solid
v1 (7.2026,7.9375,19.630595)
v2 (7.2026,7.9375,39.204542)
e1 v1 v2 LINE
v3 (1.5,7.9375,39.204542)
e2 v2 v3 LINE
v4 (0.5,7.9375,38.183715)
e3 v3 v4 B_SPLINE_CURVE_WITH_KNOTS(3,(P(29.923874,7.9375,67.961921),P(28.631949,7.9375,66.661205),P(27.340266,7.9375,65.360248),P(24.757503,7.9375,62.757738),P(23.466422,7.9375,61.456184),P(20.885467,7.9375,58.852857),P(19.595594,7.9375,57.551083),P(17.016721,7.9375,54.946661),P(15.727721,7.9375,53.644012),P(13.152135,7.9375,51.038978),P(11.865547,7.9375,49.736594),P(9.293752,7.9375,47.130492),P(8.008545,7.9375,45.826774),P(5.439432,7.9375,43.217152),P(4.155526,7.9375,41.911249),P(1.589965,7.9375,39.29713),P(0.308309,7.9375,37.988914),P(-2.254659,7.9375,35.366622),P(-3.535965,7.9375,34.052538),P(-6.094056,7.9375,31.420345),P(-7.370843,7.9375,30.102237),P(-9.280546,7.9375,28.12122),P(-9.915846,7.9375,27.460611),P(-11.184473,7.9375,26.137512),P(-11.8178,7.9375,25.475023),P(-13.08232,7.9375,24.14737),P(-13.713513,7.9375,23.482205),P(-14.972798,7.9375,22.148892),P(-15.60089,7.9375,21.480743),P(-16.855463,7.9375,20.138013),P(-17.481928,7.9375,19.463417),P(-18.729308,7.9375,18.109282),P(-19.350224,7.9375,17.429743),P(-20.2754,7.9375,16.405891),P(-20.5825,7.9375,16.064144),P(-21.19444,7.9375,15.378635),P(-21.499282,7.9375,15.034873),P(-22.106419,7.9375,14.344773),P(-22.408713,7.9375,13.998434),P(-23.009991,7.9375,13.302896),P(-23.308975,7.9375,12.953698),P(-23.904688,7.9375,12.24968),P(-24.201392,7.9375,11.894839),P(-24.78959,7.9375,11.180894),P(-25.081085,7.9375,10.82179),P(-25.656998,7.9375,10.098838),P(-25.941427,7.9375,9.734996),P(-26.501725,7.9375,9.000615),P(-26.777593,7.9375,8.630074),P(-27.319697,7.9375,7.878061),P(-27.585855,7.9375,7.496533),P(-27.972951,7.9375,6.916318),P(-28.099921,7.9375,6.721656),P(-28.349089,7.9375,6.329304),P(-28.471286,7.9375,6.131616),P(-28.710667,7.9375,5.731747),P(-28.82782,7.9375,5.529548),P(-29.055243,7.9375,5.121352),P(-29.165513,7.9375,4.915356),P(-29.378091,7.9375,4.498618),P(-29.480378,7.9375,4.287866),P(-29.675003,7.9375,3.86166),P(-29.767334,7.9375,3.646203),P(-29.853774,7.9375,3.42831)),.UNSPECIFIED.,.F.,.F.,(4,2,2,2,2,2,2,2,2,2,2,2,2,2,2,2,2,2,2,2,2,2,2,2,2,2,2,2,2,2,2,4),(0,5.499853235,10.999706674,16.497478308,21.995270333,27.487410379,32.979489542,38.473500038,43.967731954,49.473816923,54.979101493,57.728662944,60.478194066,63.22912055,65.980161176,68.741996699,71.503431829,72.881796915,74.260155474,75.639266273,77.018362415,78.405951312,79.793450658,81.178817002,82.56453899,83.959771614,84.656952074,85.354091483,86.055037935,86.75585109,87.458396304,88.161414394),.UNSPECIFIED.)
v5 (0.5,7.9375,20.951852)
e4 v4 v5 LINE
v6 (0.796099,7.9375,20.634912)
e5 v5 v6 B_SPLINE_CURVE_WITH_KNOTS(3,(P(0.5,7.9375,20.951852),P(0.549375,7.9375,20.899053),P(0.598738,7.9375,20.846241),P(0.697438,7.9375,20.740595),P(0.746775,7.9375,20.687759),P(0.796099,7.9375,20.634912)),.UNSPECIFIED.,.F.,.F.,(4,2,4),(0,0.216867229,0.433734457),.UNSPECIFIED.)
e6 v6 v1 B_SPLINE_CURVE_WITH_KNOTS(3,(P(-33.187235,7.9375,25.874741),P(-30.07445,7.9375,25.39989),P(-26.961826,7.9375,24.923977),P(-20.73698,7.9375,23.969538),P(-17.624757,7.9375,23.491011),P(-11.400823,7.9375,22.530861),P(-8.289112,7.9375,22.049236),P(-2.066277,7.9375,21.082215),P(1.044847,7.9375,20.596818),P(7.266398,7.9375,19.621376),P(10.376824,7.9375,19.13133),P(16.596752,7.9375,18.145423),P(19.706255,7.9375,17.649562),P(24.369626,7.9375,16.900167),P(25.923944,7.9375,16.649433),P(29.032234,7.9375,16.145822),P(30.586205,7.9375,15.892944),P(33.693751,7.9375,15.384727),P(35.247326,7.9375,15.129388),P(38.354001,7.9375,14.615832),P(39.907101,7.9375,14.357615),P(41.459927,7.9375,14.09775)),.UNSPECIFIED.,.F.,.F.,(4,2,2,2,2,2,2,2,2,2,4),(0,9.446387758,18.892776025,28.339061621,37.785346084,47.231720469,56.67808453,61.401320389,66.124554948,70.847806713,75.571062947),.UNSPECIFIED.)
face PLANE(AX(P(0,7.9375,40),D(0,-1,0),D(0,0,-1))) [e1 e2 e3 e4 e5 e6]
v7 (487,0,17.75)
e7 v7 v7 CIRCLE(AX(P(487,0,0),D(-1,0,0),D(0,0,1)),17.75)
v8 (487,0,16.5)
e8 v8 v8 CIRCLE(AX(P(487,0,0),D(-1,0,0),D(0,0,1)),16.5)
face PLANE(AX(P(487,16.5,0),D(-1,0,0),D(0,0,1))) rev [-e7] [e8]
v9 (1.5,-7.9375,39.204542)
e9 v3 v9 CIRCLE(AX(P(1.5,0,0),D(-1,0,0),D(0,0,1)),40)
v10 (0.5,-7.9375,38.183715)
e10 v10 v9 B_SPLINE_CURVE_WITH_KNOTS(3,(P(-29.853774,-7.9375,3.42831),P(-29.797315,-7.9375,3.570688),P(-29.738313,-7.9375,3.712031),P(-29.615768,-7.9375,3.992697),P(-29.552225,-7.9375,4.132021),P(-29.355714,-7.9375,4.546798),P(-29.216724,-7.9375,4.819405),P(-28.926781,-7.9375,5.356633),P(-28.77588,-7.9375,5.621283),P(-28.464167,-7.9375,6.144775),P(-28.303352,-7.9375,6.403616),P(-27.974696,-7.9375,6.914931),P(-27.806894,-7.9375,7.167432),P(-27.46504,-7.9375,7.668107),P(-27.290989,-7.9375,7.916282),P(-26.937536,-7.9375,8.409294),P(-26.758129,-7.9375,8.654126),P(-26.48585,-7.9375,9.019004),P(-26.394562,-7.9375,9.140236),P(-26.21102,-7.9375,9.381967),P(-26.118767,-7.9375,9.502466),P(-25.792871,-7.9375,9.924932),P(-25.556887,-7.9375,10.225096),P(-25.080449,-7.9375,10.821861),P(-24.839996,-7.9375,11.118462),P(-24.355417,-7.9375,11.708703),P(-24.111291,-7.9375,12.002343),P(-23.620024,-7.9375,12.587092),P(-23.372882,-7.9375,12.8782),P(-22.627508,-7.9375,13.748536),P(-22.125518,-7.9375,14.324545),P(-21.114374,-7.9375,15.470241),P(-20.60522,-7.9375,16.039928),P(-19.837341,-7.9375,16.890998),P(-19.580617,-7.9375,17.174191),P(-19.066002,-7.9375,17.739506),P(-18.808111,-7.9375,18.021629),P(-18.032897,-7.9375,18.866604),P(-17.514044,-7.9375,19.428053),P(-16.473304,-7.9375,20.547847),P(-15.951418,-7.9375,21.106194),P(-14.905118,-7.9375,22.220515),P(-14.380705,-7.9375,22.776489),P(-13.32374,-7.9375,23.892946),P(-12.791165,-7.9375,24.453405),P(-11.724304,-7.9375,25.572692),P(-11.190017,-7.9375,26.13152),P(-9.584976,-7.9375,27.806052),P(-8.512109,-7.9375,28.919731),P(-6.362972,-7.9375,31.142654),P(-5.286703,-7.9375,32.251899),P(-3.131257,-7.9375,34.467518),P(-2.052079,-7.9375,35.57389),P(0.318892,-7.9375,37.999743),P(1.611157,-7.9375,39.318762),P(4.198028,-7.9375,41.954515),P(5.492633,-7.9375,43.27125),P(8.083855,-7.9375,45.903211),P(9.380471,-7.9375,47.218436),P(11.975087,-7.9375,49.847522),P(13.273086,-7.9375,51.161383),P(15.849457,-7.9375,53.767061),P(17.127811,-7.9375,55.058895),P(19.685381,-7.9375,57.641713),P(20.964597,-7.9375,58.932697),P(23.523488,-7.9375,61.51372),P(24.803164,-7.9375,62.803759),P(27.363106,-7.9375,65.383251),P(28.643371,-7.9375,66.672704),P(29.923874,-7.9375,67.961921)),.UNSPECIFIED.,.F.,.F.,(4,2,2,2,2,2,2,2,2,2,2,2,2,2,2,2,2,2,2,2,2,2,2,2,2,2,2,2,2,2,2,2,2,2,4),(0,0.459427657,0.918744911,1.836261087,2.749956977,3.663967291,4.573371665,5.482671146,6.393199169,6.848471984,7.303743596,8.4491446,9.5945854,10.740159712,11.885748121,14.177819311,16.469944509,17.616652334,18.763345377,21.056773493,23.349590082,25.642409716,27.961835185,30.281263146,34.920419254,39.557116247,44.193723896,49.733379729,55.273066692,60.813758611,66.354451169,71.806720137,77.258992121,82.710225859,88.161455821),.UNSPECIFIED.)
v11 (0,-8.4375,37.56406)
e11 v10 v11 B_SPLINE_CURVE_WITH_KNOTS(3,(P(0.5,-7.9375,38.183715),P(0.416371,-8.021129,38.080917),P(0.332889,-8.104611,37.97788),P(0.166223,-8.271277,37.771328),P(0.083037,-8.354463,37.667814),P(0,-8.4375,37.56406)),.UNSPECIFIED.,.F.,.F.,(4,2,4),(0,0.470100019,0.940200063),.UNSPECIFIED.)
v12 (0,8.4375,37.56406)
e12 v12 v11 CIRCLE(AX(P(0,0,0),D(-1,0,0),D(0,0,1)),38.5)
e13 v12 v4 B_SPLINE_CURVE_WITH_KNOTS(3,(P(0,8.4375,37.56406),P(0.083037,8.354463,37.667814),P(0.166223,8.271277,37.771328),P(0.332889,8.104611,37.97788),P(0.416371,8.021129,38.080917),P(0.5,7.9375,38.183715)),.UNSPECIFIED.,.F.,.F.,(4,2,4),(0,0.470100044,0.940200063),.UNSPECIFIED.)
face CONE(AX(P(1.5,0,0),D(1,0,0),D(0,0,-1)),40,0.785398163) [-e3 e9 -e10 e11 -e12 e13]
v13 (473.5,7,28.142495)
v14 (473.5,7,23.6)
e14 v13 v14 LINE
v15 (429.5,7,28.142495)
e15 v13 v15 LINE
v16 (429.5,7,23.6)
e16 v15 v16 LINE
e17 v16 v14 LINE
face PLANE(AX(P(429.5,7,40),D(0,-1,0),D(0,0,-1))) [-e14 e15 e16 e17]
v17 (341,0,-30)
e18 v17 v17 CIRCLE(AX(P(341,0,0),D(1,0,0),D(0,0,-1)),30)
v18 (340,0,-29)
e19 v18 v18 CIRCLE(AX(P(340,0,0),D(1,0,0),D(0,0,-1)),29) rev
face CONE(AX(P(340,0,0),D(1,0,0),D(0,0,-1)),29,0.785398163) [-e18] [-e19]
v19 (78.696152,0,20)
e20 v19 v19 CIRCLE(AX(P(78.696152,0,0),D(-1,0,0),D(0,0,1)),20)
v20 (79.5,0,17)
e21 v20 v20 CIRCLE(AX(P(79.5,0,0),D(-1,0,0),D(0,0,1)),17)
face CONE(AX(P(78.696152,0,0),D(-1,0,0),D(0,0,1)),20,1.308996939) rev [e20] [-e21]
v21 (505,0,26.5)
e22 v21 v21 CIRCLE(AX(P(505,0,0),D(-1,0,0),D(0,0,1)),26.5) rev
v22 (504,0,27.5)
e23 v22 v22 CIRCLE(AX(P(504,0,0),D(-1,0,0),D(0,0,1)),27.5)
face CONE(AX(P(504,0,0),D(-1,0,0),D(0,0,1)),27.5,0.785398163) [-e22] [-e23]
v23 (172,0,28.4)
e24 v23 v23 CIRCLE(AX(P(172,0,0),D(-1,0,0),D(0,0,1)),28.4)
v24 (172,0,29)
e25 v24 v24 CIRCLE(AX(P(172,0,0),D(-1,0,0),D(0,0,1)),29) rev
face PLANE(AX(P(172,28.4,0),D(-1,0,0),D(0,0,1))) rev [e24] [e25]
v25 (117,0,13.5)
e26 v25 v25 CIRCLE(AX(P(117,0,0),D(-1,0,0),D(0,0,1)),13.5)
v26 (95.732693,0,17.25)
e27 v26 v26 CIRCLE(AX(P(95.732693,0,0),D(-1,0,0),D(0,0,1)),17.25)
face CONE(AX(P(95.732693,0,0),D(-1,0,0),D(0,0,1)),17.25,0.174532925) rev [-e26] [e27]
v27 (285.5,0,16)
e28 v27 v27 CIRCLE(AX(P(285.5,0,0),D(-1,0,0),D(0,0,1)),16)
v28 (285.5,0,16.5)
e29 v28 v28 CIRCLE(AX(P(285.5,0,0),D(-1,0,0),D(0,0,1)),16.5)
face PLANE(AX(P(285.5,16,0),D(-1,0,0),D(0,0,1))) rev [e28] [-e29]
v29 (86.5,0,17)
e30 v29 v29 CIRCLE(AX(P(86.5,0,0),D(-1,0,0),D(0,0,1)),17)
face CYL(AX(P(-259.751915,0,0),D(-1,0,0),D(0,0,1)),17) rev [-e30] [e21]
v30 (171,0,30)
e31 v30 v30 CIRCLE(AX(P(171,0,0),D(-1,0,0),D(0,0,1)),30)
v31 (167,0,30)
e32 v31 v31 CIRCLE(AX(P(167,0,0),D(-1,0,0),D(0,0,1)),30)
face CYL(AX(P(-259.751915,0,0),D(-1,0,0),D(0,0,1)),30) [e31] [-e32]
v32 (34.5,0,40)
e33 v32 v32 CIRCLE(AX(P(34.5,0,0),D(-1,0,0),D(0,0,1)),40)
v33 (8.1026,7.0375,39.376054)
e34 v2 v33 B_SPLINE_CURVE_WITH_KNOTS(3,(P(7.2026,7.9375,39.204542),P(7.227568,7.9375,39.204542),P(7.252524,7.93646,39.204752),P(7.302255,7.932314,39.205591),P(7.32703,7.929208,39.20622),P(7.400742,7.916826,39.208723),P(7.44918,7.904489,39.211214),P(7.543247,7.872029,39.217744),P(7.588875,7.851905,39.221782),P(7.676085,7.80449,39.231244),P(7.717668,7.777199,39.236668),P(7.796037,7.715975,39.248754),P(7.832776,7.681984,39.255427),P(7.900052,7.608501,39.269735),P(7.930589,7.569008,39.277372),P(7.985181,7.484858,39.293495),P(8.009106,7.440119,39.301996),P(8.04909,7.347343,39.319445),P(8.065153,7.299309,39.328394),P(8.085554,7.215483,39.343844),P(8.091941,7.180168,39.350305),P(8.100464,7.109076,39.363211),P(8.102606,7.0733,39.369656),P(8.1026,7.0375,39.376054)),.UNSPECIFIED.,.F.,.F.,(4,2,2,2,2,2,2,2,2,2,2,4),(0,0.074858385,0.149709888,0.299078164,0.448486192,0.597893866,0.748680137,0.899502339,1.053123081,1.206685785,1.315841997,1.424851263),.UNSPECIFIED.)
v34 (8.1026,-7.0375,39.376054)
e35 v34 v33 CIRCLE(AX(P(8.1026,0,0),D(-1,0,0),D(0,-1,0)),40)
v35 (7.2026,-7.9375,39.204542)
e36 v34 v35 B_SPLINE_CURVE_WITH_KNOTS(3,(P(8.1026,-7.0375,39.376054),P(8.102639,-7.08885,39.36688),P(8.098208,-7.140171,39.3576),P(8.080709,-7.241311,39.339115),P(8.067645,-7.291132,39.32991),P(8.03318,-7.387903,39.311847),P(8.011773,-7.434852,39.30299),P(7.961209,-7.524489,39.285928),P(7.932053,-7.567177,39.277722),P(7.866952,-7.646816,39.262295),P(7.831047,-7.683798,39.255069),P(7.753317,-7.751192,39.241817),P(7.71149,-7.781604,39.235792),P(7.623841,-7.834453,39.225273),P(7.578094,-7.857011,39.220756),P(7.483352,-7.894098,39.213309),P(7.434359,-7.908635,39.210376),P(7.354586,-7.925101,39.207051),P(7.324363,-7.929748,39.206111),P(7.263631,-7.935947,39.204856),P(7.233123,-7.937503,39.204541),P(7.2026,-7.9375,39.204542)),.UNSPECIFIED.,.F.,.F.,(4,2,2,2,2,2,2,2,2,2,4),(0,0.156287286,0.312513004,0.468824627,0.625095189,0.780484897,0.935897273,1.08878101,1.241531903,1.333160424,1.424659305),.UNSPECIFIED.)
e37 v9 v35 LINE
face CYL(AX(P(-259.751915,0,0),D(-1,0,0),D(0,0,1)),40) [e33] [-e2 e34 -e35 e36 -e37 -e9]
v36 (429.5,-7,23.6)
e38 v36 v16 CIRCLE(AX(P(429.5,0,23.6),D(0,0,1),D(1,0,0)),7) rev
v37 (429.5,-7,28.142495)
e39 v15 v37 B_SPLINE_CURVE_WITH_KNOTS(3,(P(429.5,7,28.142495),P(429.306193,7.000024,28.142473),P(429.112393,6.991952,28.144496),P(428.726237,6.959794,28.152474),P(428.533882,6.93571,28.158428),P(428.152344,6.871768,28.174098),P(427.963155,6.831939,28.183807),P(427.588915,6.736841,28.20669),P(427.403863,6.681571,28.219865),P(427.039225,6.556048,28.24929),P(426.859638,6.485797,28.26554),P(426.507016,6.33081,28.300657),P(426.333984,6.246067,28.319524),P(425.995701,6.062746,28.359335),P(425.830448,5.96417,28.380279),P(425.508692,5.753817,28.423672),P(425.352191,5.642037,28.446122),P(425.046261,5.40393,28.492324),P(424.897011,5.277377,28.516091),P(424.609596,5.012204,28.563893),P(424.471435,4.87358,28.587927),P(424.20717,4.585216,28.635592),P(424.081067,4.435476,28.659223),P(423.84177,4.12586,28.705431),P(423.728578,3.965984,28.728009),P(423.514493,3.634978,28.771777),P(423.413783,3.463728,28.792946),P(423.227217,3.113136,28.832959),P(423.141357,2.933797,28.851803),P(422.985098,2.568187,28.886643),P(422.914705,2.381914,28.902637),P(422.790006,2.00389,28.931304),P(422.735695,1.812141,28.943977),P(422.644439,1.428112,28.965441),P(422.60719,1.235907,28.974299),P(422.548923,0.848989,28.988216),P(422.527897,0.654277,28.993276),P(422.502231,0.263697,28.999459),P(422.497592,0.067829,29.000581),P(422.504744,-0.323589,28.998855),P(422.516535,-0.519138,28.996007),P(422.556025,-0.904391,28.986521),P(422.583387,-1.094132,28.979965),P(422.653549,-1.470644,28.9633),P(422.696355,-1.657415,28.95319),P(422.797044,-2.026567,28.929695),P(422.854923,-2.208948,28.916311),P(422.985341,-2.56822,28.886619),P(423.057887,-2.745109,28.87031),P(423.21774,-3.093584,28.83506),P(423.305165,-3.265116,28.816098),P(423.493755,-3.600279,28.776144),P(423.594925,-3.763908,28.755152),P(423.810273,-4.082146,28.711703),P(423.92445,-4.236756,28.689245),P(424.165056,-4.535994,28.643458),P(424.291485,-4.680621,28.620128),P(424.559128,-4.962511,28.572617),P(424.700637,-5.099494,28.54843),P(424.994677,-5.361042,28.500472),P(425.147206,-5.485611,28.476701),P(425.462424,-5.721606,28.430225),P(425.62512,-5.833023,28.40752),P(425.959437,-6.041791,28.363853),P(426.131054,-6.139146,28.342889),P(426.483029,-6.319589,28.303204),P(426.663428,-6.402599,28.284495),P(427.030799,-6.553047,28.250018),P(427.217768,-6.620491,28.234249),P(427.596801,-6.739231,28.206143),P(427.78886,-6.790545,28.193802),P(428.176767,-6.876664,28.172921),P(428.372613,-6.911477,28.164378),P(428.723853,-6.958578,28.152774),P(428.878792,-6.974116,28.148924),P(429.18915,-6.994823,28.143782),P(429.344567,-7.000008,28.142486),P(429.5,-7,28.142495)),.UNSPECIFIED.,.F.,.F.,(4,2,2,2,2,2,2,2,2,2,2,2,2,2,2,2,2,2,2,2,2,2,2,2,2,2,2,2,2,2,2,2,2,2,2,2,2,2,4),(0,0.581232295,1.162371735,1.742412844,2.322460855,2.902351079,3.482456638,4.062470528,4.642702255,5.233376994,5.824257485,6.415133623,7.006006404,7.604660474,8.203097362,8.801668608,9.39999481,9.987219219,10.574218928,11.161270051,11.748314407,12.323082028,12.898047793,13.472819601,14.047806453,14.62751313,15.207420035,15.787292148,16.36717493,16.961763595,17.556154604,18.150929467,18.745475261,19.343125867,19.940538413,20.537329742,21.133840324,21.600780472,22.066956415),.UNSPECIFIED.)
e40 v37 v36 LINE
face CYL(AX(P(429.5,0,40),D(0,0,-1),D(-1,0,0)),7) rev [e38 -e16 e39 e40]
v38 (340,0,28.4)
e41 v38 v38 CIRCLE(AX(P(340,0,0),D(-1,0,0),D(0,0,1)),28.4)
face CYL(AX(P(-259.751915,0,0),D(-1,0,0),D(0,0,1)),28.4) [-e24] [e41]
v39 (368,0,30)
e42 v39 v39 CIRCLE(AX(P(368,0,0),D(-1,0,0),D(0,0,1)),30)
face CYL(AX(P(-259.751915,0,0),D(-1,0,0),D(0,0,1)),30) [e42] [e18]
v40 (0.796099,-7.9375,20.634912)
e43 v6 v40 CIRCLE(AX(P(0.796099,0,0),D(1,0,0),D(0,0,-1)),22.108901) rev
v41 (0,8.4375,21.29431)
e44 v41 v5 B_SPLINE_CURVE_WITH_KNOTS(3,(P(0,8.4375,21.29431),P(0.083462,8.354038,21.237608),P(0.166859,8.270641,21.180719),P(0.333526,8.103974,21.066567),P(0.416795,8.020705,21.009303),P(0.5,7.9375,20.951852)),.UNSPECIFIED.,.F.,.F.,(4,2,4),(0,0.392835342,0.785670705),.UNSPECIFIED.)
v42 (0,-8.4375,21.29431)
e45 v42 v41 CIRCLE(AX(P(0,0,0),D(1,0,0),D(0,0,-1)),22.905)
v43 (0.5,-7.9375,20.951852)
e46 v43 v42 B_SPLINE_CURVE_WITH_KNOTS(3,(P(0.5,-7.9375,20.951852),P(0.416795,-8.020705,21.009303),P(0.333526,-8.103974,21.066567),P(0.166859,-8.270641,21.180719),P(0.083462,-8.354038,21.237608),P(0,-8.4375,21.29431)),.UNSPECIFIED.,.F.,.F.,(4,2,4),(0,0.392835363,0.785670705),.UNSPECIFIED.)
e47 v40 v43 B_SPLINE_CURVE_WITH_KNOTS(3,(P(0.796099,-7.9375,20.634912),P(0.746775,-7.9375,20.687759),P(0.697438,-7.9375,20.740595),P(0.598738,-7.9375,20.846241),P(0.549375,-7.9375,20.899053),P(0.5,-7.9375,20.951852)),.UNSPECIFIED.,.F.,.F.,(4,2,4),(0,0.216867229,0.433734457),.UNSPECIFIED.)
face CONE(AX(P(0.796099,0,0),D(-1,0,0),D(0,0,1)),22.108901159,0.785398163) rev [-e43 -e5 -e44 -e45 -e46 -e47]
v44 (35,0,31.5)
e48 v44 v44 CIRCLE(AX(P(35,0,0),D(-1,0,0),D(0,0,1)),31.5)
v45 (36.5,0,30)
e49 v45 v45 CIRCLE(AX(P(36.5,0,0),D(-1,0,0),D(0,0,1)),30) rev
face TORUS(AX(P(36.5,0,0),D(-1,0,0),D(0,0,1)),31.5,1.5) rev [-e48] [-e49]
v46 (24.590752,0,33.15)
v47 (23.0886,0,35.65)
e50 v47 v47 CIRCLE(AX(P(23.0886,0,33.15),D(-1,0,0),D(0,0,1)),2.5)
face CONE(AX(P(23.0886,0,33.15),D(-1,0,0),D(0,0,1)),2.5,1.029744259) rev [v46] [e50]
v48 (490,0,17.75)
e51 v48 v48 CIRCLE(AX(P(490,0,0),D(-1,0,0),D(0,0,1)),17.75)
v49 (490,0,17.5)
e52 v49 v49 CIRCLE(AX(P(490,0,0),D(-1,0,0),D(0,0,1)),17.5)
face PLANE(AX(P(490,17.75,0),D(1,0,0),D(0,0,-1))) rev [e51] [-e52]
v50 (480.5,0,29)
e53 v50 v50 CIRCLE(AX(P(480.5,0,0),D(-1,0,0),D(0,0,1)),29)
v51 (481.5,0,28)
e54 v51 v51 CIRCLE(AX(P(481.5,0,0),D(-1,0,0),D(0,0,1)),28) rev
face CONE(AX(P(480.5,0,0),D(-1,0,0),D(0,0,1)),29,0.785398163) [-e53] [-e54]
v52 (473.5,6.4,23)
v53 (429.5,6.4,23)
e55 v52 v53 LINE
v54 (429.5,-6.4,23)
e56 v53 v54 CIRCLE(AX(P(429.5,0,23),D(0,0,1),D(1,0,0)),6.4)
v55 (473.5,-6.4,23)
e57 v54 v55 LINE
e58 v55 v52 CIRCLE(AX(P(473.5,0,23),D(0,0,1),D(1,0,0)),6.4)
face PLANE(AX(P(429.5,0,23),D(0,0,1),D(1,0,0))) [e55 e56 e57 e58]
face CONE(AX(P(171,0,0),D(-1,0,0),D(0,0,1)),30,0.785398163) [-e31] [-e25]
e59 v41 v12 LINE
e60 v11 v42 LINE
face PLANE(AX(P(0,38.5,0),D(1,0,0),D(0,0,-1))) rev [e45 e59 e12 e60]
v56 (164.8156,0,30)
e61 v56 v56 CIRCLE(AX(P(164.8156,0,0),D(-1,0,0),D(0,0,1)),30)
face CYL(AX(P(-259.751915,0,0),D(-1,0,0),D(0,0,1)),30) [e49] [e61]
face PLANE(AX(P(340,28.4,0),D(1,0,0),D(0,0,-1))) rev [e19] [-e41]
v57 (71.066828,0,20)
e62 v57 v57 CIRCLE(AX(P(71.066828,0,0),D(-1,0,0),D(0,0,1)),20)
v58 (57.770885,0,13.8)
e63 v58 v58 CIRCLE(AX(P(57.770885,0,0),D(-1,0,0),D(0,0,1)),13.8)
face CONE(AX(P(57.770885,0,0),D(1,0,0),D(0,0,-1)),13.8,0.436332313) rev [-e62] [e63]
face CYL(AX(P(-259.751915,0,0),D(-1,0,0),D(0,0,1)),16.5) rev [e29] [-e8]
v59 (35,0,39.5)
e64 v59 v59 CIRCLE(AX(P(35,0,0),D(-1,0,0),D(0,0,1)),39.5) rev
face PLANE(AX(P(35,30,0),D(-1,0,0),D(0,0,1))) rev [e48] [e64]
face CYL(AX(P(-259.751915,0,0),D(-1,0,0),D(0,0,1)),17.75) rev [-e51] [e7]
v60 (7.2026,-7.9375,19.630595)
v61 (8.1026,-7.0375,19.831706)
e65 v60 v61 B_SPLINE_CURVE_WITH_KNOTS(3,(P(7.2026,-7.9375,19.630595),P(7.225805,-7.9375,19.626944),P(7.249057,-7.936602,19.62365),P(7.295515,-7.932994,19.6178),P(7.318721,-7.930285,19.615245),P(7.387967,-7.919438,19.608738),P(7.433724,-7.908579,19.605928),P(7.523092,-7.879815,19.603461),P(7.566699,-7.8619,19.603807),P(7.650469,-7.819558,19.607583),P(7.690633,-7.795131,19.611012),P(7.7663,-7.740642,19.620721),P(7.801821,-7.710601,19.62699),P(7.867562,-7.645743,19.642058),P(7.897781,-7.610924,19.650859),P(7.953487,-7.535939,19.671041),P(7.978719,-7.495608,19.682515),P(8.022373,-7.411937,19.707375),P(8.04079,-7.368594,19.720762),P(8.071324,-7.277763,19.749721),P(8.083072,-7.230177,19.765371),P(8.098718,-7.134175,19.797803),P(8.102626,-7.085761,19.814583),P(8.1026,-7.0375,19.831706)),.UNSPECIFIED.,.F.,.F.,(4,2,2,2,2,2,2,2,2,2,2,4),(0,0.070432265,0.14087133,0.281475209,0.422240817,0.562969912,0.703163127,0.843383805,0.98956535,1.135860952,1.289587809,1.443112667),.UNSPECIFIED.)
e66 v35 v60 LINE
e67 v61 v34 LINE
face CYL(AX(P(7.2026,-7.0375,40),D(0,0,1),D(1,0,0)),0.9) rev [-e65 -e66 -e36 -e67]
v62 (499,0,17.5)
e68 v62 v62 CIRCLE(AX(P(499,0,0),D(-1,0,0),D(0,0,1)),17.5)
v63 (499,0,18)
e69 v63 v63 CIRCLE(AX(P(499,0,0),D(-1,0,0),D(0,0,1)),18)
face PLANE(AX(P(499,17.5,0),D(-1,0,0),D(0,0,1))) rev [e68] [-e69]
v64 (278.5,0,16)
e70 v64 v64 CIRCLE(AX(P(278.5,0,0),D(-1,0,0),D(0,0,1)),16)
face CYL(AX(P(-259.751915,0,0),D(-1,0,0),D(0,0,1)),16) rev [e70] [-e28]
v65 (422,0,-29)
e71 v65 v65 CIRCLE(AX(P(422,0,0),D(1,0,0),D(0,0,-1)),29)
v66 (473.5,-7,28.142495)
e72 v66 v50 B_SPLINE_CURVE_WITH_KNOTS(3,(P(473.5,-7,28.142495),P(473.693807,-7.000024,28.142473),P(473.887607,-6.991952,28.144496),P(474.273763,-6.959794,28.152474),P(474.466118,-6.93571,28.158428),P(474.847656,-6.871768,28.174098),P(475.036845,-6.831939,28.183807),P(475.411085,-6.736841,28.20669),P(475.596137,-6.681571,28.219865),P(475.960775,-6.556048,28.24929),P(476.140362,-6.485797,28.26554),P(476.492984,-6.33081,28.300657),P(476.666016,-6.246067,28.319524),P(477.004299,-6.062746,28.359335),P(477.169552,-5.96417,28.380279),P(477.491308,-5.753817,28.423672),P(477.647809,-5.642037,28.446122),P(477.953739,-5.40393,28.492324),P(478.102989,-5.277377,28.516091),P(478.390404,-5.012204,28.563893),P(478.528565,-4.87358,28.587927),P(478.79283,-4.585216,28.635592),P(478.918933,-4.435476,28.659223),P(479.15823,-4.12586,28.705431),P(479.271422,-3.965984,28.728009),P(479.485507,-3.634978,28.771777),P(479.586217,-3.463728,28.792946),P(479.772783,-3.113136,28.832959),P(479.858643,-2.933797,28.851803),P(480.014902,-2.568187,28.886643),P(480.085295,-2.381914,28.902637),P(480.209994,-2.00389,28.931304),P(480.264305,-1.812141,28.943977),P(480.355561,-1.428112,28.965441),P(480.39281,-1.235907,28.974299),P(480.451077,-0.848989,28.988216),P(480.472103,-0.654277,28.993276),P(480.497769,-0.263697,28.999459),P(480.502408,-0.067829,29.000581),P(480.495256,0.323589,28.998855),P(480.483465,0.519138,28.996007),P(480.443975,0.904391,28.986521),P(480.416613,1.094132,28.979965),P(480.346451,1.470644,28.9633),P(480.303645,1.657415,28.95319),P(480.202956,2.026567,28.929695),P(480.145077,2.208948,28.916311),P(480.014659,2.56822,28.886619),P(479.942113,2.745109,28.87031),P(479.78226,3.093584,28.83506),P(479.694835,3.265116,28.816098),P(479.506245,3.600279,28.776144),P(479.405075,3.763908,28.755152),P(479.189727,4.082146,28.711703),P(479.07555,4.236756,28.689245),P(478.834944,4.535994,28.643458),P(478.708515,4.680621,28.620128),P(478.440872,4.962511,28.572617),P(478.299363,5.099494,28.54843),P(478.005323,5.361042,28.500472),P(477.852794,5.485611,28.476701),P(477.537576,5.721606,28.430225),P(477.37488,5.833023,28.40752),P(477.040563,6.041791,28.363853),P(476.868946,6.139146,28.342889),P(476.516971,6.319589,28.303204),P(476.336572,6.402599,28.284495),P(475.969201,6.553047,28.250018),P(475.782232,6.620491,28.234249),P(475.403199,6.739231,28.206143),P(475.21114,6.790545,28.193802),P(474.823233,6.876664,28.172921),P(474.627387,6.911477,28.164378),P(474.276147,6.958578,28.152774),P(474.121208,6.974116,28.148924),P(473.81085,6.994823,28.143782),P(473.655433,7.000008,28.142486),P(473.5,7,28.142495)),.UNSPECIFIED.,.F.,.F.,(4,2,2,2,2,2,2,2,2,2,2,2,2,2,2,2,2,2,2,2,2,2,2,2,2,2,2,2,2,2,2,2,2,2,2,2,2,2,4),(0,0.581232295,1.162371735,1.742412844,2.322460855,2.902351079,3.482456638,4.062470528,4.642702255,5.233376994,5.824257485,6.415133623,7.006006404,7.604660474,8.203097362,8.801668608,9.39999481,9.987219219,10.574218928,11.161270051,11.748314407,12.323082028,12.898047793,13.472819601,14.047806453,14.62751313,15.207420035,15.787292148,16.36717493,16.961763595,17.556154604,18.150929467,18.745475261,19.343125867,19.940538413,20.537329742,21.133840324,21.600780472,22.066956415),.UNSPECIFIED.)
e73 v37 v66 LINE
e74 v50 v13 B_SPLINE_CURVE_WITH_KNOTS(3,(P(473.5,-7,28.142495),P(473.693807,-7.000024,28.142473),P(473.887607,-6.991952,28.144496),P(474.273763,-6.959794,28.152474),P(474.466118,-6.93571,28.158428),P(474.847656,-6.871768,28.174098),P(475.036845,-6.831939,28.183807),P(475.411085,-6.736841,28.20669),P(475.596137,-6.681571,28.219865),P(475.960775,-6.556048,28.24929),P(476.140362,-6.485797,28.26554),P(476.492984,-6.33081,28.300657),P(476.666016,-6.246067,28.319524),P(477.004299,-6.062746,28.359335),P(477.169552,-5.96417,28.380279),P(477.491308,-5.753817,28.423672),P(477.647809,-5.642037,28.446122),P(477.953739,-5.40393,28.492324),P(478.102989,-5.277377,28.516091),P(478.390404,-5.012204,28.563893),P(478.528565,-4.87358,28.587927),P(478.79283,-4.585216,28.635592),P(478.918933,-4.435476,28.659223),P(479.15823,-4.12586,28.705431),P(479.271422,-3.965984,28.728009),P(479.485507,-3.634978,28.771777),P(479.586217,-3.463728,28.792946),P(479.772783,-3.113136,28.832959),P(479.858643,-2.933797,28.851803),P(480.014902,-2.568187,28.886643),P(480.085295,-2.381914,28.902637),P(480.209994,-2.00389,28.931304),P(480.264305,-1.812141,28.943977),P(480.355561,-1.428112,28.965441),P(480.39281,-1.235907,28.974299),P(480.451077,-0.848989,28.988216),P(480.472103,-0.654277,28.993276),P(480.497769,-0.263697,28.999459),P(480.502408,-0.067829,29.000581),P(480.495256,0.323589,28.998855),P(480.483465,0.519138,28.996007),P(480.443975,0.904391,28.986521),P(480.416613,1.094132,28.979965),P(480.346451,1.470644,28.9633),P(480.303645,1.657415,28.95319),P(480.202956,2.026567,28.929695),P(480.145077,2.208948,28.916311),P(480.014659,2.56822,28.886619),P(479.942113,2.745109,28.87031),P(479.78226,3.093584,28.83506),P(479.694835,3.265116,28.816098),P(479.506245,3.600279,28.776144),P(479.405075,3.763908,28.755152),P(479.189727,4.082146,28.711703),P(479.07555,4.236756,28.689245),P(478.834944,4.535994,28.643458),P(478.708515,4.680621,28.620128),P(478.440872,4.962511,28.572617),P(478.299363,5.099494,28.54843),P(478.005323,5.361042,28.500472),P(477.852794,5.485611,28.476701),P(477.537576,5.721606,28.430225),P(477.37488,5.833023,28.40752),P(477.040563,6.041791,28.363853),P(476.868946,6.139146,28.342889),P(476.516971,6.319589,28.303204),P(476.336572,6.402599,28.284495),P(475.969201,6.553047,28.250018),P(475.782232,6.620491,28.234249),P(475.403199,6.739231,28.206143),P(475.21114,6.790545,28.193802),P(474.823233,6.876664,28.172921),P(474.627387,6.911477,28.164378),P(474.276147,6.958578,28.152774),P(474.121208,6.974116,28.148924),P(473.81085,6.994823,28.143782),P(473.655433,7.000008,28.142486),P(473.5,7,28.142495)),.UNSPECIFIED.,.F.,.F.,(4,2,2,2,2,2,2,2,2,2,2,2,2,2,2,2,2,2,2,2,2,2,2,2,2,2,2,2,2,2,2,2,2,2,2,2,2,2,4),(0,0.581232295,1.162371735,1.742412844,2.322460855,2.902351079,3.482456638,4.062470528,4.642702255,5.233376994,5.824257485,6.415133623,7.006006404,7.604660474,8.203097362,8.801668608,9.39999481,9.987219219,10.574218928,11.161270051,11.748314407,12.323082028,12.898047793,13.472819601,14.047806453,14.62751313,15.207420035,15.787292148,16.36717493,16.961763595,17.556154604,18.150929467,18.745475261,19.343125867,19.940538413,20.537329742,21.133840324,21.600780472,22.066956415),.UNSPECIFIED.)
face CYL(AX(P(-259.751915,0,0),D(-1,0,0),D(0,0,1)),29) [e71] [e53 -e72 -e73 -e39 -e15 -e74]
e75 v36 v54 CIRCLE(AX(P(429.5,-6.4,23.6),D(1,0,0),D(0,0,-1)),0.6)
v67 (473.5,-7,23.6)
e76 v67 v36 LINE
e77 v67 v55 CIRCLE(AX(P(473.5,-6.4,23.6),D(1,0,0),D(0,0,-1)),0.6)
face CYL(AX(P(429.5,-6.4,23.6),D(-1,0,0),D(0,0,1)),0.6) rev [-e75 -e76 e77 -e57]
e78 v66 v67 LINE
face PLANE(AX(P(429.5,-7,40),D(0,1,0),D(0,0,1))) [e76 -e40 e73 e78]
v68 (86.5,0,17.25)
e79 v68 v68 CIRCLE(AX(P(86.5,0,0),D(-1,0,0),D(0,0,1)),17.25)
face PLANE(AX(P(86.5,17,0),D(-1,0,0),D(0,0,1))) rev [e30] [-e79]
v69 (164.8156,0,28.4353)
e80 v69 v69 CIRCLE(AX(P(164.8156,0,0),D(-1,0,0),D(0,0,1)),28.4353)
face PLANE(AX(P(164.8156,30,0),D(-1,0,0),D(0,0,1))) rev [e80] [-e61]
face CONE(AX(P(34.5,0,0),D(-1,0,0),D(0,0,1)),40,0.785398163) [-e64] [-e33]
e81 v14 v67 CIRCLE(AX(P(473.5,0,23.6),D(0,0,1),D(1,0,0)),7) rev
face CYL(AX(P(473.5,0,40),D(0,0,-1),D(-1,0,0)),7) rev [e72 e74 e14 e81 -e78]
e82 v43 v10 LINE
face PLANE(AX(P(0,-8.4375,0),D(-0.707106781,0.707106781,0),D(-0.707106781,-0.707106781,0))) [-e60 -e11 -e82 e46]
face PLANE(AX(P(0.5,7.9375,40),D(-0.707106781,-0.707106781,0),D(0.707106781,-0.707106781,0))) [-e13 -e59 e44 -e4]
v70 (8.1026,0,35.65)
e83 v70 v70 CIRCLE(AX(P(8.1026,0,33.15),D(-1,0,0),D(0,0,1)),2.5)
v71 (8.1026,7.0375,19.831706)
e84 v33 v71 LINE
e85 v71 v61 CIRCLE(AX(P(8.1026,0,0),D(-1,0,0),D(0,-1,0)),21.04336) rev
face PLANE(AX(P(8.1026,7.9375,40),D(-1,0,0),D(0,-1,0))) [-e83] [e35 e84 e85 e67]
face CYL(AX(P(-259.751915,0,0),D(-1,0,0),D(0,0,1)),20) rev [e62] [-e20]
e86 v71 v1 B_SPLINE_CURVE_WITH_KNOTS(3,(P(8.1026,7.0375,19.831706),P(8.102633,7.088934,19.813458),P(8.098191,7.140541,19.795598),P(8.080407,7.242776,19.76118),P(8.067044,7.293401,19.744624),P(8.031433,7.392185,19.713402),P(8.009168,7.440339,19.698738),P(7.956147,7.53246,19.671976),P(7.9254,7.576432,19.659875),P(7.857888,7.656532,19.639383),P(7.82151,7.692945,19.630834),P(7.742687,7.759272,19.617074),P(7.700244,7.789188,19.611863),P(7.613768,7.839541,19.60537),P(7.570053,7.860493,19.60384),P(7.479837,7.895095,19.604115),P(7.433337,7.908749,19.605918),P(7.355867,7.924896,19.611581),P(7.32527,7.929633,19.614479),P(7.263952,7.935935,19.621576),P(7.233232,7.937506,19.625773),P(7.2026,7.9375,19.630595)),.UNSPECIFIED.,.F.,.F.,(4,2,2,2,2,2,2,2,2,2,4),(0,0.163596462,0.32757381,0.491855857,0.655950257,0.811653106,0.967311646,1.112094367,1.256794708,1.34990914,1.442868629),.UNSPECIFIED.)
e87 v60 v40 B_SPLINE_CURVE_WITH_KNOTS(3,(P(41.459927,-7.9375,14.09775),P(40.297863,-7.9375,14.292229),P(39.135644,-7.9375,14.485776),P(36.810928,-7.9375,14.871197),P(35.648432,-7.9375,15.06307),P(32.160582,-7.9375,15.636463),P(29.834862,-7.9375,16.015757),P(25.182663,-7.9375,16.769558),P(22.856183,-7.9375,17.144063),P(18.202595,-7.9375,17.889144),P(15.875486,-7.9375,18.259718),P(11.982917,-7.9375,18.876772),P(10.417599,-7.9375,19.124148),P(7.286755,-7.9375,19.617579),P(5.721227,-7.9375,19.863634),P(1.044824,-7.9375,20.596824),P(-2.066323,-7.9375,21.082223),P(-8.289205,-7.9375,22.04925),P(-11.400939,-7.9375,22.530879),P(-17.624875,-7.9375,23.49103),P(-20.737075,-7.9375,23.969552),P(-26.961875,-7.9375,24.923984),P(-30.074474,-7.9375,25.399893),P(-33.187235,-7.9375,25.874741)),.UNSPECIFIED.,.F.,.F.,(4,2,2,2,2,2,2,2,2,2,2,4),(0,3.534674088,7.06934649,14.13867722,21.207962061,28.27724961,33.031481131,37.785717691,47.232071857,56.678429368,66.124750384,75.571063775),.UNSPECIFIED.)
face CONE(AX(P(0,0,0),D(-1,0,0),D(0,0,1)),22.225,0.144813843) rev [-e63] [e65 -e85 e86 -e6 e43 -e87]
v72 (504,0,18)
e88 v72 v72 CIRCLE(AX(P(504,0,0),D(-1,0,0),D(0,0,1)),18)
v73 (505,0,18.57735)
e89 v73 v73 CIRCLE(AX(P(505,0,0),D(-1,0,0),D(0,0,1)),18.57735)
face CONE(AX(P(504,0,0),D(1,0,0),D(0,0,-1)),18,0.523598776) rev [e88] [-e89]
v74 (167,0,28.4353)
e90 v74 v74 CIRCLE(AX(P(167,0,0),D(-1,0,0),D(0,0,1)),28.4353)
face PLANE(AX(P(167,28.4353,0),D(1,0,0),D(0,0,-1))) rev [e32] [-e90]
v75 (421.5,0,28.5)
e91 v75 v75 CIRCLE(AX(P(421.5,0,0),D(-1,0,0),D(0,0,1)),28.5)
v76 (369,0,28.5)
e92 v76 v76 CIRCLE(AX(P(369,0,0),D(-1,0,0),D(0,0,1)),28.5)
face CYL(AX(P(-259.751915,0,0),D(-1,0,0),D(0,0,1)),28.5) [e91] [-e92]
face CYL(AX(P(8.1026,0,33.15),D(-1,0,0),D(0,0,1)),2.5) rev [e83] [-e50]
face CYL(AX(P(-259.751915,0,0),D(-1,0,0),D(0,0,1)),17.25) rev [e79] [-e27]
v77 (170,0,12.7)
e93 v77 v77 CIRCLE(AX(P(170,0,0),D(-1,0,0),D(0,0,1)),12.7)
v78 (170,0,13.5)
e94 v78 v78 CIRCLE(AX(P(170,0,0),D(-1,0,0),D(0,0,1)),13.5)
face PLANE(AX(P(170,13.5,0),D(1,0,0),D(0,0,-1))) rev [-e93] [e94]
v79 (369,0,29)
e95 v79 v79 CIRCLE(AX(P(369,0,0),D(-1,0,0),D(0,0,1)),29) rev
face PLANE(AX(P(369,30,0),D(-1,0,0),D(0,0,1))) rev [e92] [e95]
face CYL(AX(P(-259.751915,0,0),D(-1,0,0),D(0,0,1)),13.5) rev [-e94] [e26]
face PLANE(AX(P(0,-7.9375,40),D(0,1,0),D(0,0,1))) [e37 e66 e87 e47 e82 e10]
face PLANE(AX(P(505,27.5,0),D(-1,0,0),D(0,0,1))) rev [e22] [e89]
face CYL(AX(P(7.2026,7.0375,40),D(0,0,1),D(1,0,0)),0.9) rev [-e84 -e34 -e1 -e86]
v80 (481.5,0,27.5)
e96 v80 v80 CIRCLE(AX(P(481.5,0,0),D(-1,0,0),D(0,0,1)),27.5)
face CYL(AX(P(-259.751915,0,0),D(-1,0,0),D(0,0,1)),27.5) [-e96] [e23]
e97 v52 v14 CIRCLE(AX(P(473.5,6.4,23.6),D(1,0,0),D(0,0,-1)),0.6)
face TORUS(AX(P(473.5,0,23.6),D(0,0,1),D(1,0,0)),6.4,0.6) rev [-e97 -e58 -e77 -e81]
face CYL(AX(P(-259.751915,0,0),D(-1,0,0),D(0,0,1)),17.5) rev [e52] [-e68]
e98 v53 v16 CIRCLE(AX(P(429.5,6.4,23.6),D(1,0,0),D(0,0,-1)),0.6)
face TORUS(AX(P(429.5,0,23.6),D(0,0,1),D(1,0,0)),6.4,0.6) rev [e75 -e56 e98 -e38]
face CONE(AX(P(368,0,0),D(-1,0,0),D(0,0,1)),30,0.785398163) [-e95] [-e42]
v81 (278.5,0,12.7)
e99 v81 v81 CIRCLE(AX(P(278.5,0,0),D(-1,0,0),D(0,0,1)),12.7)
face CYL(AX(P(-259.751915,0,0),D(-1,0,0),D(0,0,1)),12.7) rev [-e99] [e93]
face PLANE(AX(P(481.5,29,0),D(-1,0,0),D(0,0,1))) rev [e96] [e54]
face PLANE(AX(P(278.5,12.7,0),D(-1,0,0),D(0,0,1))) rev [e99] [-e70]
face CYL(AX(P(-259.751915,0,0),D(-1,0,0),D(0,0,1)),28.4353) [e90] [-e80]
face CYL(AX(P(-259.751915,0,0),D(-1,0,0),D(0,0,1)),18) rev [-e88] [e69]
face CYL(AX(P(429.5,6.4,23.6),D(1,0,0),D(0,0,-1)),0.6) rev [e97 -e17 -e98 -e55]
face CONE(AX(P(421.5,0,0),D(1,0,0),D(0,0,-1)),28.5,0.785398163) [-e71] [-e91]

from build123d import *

# Parameters (mm, degrees)
SKETCH2_W                 = 8.1026
SKETCH2_H                 = 15.875
CUT_EXTRUDE1_DEPTH        = 509.158439859
FILLET1_R                 = 0.9
CHAMFER1_SIZE             = 0.5
CHAMFER2_SIZE             = 0.68
CHAMFER2_SIZE2            = 0.804519922
M6X1_0_TAPPED_HOLE3_D     = 5
M6X1_0_TAPPED_HOLE3_DEPTH = 14.986
M6X1_0_TAPPED_HOLE3_TIP   = 1.502151548
CUT_EXTRUDE2_DEPTH        = 511.484084003
FILLET9_R                 = 0.6
CHAMFER3_SIZE             = 1
FILLET11_R                = 1.5
CHAMFER4_SIZE             = 0.5
CHAMFER5_SIZE             = 1
CHAMFER6_SIZE             = 1
CHAMFER8_SIZE             = 1
CHAMFER9_SIZE             = 0.5


with BuildPart() as part:
    # Sketch1 → Revolve1 (revolve)
    with BuildSketch(Plane.XY, mode=Mode.PRIVATE) as revolve1_sk:
        Polygon((0, 38.5), (0, 22.225), (57.770884658, 13.8), (71.066827565, 20), (78.696152423, 20), (79.5, 17), (86.5, 17), (86.5, 17.25), (95.732693176, 17.25), (117, 13.5), (170, 13.5), (170, 12.7), (278.5, 12.7), (278.5, 16), (285.5, 16), (285.5, 16.5), (487, 16.5), (487, 17.75), (490, 17.75), (490, 17.5), (499, 17.5), (499, 18), (504, 18), (505, 18.577350269), (505, 27.5), (481.5, 27.5), (481.5, 29), (421.5, 29), (421.5, 28.5), (369, 28.5), (369, 30), (340, 30), (340, 28.4), (172, 28.4), (172, 30), (167, 30), (167, 28.4353), (164.8156, 28.4353), (164.8156, 30), (35, 30), (35, 40), (1.5, 40), align=None)
    revolve(revolve1_sk.sketch.rotate(Axis((-259.751915285, 0, 0), (1, 0, 0)), 90), axis=Axis((-259.751915285, 0, 0), (1, 0, 0)))

    # Sketch2 → Cut-Extrude1 (cut, through all)
    with BuildSketch(Plane.XY):
        with Locations((4.0513, 0)):
            Rectangle(SKETCH2_W, SKETCH2_H)
    extrude(amount=CUT_EXTRUDE1_DEPTH, mode=Mode.SUBTRACT)

    # Fillet1
    fillet1_edges = [part.edges().sort_by_distance(p)[0] for p in [
        (8.1026, -7.9375, 29.346744713),
        (8.1026, 7.9375, 29.346744713),
    ]]
    fillet(fillet1_edges, radius=FILLET1_R)

    # Chamfer1
    chamfer1_edges = [part.edges().sort_by_distance(p)[0] for p in [
        (0, -7.9375, 29.216069478),
        (0, 7.9375, 29.216069478),
    ]]
    chamfer(chamfer1_edges, length=CHAMFER1_SIZE)

    # Chamfer2
    chamfer2_edges = [part.edges().sort_by_distance(p)[0] for p in [
        (0, 0, -22.225),
    ]]
    chamfer2_side = [part.faces().sort_by_distance(p)[0] for p in [
        (0, 0, -23.307346581),
    ]]
    chamfer(chamfer2_edges, length=CHAMFER2_SIZE, length2=CHAMFER2_SIZE2, reference=chamfer2_side[0])

    # M6x1.0 Tapped Hole3
    with Locations(Plane.ZY.offset(-8.1026)):
        with Locations((33.15, 0)):
            Hole(M6X1_0_TAPPED_HOLE3_D / 2, depth=M6X1_0_TAPPED_HOLE3_DEPTH)
            with Locations((0, 0, -(M6X1_0_TAPPED_HOLE3_DEPTH + M6X1_0_TAPPED_HOLE3_TIP / 2))):  # 118° drill point
                Cone(0, M6X1_0_TAPPED_HOLE3_D / 2, M6X1_0_TAPPED_HOLE3_TIP, mode=Mode.SUBTRACT)

    # Sketch5 → Cut-Extrude2 (cut, through all)
    with BuildSketch(Plane.XY.offset(23)):
        with BuildLine():
            Line((429.5, 7), (473.5, 7))
            ThreePointArc((473.5, 7), (480.5, 0), (473.5, -7))
            Line((473.5, -7), (429.5, -7))
            ThreePointArc((429.5, -7), (422.5, 0), (429.5, 7))
        make_face()
    extrude(amount=CUT_EXTRUDE2_DEPTH, mode=Mode.SUBTRACT)

    # Fillet9
    fillet9_edges = [part.edges().sort_by_distance(p)[0] for p in [
        (422.5, 0, 23),
        (451.5, -7, 23),
        (480.5, 0, 23),
        (451.5, 7, 23),
    ]]
    fillet(fillet9_edges, radius=FILLET9_R)

    # Chamfer3
    chamfer3_edges = [part.edges().sort_by_distance(p)[0] for p in [
        (505, 0, -27.5),
    ]]
    chamfer(chamfer3_edges, length=CHAMFER3_SIZE)

    # Fillet11
    fillet11_edges = [part.edges().sort_by_distance(p)[0] for p in [
        (35, 0, -30),
    ]]
    fillet(fillet11_edges, radius=FILLET11_R)

    # Chamfer4
    chamfer4_edges = [part.edges().sort_by_distance(p)[0] for p in [
        (35, 0, -40),
    ]]
    chamfer(chamfer4_edges, length=CHAMFER4_SIZE)

    # Chamfer5
    chamfer5_edges = [part.edges().sort_by_distance(p)[0] for p in [
        (172, 0, -30),
    ]]
    chamfer(chamfer5_edges, length=CHAMFER5_SIZE)

    # Chamfer6
    chamfer6_edges = [part.edges().sort_by_distance(p)[0] for p in [
        (340, 0, -30),
        (369, 0, -30),
    ]]
    chamfer(chamfer6_edges, length=CHAMFER6_SIZE)

    # Chamfer8
    chamfer8_edges = [part.edges().sort_by_distance(p)[0] for p in [
        (481.5, 0, -29),
    ]]
    chamfer(chamfer8_edges, length=CHAMFER8_SIZE)

    # Chamfer9
    chamfer9_edges = [part.edges().sort_by_distance(p)[0] for p in [
        (421.5, 0, -29),
    ]]
    chamfer(chamfer9_edges, length=CHAMFER9_SIZE - 0.0001)  # a hair under: the kernel refuses the full size


solid = part.part
